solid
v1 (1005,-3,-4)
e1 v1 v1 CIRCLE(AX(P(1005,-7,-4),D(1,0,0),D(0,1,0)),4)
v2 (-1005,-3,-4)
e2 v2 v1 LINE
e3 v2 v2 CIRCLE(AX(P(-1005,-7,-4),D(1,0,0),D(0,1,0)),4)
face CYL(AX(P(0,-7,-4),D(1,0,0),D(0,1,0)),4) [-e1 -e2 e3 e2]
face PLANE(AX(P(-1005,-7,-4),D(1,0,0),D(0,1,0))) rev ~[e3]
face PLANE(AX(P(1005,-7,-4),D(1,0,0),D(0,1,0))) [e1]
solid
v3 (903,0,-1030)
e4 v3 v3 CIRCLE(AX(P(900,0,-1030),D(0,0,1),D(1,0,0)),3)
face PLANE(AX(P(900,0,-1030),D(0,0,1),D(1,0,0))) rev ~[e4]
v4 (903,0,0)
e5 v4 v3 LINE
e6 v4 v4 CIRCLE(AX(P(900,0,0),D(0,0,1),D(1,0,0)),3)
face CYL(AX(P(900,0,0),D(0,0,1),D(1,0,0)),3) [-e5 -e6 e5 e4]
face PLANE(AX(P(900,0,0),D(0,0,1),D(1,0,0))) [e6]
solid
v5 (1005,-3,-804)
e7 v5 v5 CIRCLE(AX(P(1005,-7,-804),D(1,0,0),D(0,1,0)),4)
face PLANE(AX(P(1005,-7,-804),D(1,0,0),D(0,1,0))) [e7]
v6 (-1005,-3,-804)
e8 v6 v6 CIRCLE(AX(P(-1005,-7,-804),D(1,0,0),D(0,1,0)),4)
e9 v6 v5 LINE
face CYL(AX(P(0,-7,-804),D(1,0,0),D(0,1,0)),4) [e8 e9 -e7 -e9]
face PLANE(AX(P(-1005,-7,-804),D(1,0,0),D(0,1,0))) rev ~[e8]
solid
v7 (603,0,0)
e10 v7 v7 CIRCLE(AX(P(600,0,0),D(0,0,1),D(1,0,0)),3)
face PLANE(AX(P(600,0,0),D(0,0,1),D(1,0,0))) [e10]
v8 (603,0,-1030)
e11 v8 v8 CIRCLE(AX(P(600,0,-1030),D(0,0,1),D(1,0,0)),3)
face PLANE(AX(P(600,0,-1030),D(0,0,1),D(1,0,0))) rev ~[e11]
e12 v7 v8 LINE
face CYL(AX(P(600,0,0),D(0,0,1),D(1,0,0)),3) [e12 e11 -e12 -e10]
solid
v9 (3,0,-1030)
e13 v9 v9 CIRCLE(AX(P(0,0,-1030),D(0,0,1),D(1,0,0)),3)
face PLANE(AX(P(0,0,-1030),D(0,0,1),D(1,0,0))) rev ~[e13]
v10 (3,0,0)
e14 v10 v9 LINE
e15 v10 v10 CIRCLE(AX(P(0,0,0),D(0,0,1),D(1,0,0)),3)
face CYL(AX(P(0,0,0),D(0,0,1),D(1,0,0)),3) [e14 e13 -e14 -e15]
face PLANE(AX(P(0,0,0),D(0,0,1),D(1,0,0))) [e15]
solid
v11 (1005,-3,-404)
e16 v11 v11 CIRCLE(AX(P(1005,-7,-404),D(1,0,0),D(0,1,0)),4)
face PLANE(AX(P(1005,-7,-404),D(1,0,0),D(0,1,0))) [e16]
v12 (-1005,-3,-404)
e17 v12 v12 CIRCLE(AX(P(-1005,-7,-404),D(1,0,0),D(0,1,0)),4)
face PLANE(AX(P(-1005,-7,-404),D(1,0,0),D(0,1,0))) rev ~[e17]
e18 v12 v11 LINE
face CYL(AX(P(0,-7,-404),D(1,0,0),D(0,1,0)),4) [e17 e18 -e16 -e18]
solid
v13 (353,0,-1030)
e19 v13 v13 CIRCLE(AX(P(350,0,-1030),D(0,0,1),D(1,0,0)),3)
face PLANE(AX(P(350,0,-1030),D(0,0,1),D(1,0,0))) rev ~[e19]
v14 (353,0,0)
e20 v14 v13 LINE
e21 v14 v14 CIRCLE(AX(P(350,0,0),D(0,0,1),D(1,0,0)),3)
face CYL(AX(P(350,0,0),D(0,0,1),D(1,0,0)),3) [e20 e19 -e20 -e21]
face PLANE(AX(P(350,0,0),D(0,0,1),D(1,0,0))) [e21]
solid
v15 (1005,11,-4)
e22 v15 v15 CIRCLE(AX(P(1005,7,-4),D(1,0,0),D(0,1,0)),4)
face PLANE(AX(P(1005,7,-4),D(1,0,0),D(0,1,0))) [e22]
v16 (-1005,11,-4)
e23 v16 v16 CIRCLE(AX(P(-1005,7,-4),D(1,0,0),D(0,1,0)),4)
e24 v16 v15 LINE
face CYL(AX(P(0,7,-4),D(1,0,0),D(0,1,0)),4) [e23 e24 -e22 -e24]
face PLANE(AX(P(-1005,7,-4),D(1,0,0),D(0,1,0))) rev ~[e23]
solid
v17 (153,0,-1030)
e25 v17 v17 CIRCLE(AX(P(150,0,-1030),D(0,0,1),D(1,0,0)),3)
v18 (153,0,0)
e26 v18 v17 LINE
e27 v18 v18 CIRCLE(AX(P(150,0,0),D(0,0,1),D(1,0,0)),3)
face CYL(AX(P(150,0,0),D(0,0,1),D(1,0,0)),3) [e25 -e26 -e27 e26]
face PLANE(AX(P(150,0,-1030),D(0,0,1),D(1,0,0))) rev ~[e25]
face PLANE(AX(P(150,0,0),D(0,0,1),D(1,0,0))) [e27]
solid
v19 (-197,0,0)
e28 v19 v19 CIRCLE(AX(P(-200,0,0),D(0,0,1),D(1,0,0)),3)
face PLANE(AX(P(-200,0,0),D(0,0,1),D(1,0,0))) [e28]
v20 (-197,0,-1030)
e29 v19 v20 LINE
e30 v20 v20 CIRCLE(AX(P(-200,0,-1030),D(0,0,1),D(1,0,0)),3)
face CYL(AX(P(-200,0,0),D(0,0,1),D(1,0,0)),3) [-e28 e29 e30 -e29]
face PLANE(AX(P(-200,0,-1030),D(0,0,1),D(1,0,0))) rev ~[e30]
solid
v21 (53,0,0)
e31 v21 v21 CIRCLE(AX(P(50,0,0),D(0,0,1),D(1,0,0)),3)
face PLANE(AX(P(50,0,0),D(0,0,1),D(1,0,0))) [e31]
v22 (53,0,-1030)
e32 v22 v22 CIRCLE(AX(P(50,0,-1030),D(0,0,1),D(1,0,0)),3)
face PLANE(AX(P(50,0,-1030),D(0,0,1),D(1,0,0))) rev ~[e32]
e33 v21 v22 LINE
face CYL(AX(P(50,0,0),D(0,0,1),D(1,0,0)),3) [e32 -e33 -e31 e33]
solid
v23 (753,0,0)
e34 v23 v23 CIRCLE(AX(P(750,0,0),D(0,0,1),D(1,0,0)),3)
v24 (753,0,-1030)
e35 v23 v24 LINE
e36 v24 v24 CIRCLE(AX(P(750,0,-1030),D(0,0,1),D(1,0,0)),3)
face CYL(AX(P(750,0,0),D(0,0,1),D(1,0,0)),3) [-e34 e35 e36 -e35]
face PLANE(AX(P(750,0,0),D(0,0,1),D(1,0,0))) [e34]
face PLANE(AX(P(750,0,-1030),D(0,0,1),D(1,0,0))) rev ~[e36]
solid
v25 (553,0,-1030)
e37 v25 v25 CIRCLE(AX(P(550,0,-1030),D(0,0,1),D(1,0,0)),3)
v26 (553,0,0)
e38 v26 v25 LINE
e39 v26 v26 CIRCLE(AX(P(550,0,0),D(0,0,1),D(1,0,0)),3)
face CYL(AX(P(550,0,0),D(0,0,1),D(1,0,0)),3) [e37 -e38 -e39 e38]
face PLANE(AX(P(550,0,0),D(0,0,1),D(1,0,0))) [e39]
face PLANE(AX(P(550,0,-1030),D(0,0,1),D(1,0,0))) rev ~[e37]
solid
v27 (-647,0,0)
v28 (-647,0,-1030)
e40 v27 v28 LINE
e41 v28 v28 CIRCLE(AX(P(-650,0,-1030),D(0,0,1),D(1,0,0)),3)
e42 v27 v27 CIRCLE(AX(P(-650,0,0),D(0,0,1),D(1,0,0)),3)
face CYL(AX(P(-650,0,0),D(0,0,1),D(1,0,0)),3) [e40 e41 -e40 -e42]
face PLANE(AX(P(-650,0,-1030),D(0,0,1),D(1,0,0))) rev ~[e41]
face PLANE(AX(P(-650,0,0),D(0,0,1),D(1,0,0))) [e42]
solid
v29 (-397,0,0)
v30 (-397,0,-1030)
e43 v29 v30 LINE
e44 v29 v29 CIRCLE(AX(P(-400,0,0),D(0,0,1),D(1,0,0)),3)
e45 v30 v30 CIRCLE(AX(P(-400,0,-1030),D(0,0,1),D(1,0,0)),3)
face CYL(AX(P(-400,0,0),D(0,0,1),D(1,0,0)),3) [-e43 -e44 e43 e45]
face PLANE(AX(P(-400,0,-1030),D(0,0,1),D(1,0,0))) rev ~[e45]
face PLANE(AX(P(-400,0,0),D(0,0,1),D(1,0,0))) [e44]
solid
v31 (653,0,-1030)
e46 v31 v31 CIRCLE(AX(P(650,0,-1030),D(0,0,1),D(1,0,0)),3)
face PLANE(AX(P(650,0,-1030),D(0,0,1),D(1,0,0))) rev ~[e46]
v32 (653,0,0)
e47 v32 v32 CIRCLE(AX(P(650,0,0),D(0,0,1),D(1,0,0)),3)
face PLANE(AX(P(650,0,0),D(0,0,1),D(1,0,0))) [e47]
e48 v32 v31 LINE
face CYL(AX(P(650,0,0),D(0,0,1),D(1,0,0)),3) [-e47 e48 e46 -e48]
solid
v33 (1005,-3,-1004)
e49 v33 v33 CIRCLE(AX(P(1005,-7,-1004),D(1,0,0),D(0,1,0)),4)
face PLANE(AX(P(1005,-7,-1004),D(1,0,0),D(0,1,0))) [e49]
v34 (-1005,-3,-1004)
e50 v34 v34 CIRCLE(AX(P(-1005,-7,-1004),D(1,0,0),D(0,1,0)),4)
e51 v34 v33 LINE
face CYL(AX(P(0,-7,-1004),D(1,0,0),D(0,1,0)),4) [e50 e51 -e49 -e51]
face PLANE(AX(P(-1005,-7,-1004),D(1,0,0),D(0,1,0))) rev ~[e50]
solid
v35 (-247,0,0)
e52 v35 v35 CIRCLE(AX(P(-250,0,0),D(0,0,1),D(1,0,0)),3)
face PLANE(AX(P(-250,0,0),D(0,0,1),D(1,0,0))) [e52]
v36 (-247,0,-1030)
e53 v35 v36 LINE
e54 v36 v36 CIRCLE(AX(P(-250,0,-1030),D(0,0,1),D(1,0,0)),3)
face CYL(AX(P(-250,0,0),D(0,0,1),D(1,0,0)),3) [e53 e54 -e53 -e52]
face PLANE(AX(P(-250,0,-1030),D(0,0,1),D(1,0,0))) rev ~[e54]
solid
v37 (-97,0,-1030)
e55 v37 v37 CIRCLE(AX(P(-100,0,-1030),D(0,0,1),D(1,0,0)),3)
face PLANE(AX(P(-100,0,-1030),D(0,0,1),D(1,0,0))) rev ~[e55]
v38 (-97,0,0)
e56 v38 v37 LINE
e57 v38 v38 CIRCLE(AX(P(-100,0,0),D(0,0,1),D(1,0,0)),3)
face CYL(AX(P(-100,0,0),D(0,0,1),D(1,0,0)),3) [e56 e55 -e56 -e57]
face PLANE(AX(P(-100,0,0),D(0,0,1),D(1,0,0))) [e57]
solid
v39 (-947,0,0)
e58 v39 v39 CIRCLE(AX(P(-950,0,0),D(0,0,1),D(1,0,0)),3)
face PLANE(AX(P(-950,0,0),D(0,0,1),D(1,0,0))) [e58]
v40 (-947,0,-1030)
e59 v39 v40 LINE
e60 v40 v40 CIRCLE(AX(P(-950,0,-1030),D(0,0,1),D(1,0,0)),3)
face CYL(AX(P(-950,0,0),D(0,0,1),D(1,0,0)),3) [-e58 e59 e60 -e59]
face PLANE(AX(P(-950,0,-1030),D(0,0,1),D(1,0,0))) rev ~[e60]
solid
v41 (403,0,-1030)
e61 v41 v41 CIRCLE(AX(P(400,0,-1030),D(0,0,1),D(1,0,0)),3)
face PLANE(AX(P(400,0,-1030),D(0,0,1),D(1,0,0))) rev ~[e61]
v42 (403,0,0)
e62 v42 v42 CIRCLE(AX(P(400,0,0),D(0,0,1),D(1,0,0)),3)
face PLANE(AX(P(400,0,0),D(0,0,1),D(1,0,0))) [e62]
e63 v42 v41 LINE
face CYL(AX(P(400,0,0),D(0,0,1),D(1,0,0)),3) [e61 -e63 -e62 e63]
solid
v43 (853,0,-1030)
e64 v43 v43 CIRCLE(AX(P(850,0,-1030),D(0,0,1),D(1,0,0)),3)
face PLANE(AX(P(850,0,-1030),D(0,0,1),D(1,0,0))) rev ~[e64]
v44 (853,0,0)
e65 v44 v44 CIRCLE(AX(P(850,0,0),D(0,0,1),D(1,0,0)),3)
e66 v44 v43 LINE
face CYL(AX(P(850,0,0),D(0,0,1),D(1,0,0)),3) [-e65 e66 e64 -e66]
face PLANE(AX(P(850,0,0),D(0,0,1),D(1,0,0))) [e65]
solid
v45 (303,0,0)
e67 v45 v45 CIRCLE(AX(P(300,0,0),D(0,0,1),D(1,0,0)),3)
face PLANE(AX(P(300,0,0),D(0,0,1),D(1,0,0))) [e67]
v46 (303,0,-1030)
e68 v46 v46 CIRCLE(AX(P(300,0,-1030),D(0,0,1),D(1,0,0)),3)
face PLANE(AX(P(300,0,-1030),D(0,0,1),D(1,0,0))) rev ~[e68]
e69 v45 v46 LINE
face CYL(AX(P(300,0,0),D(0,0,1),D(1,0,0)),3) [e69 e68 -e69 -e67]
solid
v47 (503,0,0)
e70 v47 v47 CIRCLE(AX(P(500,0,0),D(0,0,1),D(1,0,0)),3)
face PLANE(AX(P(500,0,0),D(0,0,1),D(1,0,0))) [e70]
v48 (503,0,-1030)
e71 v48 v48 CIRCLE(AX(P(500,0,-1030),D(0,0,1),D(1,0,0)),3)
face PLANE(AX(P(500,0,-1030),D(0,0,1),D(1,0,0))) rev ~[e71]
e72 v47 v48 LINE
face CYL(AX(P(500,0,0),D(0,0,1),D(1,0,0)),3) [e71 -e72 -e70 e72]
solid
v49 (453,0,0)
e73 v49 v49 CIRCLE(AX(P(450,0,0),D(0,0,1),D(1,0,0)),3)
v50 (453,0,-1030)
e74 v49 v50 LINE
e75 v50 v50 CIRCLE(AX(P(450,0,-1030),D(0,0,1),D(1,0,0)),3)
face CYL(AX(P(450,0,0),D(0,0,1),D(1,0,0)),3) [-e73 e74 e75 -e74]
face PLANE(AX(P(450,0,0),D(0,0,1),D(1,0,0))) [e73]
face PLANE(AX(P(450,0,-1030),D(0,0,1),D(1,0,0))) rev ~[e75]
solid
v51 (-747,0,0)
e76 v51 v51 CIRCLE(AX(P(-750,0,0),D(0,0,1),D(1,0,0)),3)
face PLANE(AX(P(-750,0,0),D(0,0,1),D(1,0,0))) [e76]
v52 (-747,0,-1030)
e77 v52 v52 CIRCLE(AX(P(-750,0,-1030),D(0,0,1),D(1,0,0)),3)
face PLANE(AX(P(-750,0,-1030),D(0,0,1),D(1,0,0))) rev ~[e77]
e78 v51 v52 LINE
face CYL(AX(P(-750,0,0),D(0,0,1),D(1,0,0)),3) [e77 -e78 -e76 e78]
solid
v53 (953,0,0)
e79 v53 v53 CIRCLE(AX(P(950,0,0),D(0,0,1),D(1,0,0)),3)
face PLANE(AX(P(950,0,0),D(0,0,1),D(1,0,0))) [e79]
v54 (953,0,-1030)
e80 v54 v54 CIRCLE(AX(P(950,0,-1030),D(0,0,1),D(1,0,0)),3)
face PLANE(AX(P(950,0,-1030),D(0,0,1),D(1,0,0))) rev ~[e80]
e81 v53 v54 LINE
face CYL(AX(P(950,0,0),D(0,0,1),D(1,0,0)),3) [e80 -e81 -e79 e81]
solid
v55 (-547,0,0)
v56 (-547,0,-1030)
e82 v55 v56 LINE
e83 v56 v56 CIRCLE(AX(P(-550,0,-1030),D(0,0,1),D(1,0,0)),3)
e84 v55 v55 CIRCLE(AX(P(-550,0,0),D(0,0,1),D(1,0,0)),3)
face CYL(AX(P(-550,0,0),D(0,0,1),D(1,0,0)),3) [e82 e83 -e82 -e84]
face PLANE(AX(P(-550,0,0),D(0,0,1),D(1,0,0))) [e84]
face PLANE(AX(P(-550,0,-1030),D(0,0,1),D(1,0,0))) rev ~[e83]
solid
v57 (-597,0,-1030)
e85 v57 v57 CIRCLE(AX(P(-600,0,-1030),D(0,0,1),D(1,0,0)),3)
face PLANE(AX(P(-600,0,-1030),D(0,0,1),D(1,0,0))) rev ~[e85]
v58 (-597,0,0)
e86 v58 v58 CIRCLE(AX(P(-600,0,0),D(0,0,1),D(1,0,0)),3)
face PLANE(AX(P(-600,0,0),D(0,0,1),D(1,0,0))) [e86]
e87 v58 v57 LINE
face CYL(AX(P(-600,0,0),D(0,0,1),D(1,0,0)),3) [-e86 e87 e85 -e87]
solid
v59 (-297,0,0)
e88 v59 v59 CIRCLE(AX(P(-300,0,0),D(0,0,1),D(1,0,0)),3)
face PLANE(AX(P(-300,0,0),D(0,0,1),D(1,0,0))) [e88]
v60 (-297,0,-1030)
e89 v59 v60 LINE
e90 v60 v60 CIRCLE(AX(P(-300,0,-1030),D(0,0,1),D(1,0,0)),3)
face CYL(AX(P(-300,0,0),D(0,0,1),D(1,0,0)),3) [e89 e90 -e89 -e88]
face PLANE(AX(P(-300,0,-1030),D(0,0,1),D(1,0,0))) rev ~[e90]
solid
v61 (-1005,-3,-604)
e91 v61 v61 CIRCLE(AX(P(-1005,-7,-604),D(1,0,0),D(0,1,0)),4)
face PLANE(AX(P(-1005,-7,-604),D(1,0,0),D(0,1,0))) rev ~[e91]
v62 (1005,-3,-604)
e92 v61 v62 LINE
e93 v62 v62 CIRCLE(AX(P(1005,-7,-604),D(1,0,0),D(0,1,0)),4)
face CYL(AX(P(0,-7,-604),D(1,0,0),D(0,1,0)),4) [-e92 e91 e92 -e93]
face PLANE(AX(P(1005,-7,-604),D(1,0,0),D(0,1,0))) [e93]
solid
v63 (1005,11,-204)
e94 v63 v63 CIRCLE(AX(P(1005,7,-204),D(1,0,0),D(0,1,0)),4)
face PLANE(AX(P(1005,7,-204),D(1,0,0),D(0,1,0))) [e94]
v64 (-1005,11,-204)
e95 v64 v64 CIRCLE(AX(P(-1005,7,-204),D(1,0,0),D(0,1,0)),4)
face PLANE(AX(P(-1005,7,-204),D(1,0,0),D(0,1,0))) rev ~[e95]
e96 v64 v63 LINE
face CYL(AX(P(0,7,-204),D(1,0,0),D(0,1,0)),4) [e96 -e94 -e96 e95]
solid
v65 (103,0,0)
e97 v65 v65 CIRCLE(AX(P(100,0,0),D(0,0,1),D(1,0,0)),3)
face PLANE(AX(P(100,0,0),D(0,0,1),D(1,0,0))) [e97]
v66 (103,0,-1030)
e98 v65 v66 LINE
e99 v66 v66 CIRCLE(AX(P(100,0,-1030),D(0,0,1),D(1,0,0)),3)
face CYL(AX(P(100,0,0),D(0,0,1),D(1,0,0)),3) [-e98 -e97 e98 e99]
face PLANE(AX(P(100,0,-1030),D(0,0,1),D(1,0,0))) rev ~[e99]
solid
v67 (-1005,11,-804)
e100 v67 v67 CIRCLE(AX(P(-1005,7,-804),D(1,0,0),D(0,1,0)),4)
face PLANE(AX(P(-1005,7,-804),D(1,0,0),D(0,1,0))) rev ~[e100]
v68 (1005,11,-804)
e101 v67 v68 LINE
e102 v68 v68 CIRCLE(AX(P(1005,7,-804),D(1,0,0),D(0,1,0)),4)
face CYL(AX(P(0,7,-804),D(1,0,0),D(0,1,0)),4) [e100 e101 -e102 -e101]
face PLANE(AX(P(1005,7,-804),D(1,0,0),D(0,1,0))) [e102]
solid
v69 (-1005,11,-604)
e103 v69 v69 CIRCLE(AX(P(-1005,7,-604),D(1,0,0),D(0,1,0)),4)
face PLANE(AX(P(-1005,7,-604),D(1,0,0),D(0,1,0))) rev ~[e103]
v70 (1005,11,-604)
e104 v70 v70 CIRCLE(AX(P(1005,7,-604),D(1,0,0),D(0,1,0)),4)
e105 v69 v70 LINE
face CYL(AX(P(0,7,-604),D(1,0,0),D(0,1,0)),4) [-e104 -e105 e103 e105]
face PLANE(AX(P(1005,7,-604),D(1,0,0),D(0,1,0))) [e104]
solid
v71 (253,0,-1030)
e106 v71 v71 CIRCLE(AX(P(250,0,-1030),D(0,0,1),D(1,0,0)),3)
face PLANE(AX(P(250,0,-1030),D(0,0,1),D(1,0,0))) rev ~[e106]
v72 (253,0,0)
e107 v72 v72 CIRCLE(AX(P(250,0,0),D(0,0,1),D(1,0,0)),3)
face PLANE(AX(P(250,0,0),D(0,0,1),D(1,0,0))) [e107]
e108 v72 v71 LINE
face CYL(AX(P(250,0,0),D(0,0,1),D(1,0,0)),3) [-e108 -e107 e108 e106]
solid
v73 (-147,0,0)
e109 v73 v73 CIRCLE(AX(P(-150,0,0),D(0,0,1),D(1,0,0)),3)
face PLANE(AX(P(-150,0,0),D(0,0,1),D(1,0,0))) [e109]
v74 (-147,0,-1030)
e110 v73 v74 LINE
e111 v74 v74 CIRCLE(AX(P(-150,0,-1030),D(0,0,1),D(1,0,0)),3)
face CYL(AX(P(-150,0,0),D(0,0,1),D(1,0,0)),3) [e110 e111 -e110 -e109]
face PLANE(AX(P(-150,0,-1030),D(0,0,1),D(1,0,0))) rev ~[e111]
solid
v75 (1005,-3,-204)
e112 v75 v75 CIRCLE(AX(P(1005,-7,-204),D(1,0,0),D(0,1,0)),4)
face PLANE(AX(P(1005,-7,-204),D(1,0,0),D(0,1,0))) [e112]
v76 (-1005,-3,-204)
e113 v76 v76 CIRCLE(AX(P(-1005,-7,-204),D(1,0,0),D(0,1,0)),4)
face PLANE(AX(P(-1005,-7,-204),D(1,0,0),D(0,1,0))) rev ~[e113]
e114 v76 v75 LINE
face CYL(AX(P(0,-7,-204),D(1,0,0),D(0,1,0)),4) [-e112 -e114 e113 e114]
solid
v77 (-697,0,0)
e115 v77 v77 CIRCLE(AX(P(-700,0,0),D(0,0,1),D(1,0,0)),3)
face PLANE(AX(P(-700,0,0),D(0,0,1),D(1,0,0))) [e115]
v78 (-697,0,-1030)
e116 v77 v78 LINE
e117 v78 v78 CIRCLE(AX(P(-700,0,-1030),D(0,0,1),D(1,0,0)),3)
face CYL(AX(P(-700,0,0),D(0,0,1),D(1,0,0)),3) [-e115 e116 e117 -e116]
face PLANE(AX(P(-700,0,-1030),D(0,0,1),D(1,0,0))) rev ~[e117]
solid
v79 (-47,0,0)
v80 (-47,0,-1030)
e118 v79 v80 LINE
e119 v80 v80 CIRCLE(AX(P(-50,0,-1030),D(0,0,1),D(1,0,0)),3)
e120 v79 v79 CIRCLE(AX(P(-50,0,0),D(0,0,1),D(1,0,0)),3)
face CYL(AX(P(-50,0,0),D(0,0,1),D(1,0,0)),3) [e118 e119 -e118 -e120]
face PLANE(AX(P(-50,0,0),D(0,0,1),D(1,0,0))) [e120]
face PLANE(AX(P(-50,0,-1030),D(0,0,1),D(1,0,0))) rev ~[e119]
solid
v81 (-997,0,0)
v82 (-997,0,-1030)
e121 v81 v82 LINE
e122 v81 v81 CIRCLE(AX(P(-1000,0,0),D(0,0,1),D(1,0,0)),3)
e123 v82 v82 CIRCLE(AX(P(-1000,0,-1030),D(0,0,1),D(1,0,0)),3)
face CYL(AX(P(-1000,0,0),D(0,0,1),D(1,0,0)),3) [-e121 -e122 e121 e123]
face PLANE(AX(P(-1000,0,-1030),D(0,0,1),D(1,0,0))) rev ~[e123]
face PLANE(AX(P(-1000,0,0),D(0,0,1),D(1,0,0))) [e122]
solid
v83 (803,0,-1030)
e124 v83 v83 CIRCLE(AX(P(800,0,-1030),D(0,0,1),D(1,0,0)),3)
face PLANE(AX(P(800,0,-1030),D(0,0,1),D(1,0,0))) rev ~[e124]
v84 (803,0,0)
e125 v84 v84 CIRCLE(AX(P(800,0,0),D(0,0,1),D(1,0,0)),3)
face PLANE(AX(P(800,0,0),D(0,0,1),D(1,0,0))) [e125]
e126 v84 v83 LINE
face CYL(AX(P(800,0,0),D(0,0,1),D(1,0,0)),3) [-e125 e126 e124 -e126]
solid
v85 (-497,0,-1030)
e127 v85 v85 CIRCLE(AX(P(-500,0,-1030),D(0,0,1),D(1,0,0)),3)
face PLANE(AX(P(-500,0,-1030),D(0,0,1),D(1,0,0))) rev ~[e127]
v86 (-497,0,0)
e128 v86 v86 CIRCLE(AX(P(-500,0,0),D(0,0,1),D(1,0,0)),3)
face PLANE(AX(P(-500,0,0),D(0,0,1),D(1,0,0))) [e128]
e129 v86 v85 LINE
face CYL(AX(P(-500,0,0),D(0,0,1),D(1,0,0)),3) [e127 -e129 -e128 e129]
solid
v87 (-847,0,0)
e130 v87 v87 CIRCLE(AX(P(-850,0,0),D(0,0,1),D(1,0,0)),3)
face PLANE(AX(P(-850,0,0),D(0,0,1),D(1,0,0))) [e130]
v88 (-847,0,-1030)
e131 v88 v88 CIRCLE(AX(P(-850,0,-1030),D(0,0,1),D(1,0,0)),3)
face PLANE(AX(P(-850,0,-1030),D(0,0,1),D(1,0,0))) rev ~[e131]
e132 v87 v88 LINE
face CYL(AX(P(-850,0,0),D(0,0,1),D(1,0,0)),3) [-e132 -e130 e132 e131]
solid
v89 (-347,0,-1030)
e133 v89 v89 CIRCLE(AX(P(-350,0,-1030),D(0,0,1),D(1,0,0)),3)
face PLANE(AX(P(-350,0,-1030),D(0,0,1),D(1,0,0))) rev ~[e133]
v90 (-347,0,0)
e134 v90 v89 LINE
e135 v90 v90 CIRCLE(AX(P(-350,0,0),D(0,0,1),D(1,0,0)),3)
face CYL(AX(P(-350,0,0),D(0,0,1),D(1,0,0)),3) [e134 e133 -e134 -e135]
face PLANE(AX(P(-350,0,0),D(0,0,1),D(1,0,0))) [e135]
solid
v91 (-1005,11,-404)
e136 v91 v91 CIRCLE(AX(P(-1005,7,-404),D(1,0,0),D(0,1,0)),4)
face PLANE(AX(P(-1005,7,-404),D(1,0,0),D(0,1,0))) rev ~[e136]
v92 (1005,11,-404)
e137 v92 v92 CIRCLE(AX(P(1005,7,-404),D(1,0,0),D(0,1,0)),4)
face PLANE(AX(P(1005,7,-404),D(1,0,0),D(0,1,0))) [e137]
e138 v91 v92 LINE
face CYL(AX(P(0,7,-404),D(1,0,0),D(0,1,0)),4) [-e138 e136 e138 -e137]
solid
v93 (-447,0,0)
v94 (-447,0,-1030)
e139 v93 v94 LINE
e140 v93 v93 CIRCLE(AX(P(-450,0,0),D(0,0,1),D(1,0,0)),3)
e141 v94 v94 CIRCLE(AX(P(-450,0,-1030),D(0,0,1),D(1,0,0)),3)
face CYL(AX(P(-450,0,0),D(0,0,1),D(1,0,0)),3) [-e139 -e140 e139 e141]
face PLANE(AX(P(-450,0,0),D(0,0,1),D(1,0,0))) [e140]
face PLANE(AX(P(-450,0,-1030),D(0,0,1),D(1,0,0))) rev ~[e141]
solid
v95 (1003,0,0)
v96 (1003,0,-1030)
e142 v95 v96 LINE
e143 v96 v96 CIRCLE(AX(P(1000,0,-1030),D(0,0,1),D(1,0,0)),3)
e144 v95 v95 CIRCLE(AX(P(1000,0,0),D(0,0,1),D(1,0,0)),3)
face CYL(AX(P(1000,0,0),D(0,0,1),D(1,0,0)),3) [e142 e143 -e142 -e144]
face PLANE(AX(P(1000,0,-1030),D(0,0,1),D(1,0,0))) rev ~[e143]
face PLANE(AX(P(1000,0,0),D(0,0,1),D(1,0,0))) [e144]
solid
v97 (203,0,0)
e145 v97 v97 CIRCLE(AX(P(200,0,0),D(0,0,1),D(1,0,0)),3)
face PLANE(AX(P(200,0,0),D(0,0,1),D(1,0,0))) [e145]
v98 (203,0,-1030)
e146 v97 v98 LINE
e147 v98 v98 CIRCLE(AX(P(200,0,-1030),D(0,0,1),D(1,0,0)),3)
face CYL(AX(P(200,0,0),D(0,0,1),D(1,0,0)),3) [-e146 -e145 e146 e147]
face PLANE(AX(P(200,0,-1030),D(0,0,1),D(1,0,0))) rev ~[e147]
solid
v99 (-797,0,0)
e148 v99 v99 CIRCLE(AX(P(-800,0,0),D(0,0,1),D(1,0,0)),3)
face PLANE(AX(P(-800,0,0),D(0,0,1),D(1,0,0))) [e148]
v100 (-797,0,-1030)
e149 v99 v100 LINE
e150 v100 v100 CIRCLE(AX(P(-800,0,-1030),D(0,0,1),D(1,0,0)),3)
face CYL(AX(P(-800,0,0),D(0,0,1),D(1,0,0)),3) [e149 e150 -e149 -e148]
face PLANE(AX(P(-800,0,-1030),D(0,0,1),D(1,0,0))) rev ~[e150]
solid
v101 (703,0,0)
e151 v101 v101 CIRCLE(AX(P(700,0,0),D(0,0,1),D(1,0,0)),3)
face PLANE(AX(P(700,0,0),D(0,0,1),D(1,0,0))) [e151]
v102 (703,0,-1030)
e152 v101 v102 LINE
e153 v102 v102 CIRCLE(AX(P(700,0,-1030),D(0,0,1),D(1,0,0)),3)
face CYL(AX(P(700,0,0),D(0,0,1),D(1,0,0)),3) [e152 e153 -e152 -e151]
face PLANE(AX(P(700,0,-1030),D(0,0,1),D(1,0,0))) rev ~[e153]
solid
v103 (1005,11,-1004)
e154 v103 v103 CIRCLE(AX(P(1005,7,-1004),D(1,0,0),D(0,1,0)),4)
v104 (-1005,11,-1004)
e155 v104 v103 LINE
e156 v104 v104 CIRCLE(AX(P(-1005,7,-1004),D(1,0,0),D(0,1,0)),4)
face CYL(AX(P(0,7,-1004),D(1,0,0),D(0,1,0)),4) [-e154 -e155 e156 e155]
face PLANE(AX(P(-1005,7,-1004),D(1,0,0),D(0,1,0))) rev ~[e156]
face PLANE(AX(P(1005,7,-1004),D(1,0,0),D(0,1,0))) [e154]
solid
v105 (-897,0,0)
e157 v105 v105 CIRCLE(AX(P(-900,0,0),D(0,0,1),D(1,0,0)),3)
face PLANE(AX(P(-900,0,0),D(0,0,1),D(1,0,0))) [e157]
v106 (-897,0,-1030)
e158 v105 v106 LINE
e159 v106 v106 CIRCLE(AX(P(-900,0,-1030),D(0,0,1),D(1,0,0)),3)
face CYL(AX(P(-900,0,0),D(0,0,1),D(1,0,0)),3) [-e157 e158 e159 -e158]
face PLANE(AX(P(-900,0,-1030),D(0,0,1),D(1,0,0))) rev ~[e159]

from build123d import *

# Parameters (mm, degrees)
F0_R     = 3
F1_DEPTH = 1030
F2_R     = 4
F3_DEPTH = 1005


with BuildPart() as f1:
    # F0 (on Top) → F1 (new body)
    with BuildSketch(Plane.XY):
        with Locations((750, 0)):
            Circle(F0_R)
    extrude(amount=-F1_DEPTH)


with BuildPart() as f1b:
    # F0 (on Top) → F1, piece 2 (new body)
    with BuildSketch(Plane.XY):
        with Locations((-550, 0)):
            Circle(F0_R)
    extrude(amount=-F1_DEPTH)


with BuildPart() as f1c:
    # F0 (on Top) → F1, piece 3 (new body)
    with BuildSketch(Plane.XY):
        with Locations((950, 0)):
            Circle(F0_R)
    extrude(amount=-F1_DEPTH)


with BuildPart() as f1d:
    # F0 (on Top) → F1, piece 4 (new body)
    with BuildSketch(Plane.XY):
        with Locations((450, 0)):
            Circle(F0_R)
    extrude(amount=-F1_DEPTH)


with BuildPart() as f1e:
    # F0 (on Top) → F1, piece 5 (new body)
    with BuildSketch(Plane.XY):
        with Locations((-800, 0)):
            Circle(F0_R)
    extrude(amount=-F1_DEPTH)


with BuildPart() as f1f:
    # F0 (on Top) → F1, piece 6 (new body)
    with BuildSketch(Plane.XY):
        with Locations((-900, 0)):
            Circle(F0_R)
    extrude(amount=-F1_DEPTH)


with BuildPart() as f1g:
    # F0 (on Top) → F1, piece 7 (new body)
    with BuildSketch(Plane.XY):
        with Locations((350, 0)):
            Circle(F0_R)
    extrude(amount=-F1_DEPTH)


with BuildPart() as f1h:
    # F0 (on Top) → F1, piece 8 (new body)
    with BuildSketch(Plane.XY):
        with Locations((-700, 0)):
            Circle(F0_R)
    extrude(amount=-F1_DEPTH)


with BuildPart() as f1i:
    # F0 (on Top) → F1, piece 9 (new body)
    with BuildSketch(Plane.XY):
        with Locations((1000, 0)):
            Circle(F0_R)
    extrude(amount=-F1_DEPTH)


with BuildPart() as f1j:
    # F0 (on Top) → F1, piece 10 (new body)
    with BuildSketch(Plane.XY):
        with Locations((600, 0)):
            Circle(F0_R)
    extrude(amount=-F1_DEPTH)


with BuildPart() as f1k:
    # F0 (on Top) → F1, piece 11 (new body)
    with BuildSketch(Plane.XY):
        with Locations((700, 0)):
            Circle(F0_R)
    extrude(amount=-F1_DEPTH)


with BuildPart() as f1l:
    # F0 (on Top) → F1, piece 12 (new body)
    with BuildSketch(Plane.XY):
        with Locations((650, 0)):
            Circle(F0_R)
    extrude(amount=-F1_DEPTH)


with BuildPart() as f1m:
    # F0 (on Top) → F1, piece 13 (new body)
    with BuildSketch(Plane.XY):
        with Locations((-650, 0)):
            Circle(F0_R)
    extrude(amount=-F1_DEPTH)


with BuildPart() as f1n:
    # F0 (on Top) → F1, piece 14 (new body)
    with BuildSketch(Plane.XY):
        with Locations((850, 0)):
            Circle(F0_R)
    extrude(amount=-F1_DEPTH)


with BuildPart() as f1o:
    # F0 (on Top) → F1, piece 15 (new body)
    with BuildSketch(Plane.XY):
        with Locations((-300, 0)):
            Circle(F0_R)
    extrude(amount=-F1_DEPTH)


with BuildPart() as f1p:
    # F0 (on Top) → F1, piece 16 (new body)
    with BuildSketch(Plane.XY):
        with Locations((-250, 0)):
            Circle(F0_R)
    extrude(amount=-F1_DEPTH)


with BuildPart() as f1q:
    # F0 (on Top) → F1, piece 17 (new body)
    with BuildSketch(Plane.XY):
        with Locations((-350, 0)):
            Circle(F0_R)
    extrude(amount=-F1_DEPTH)


with BuildPart() as f1r:
    # F0 (on Top) → F1, piece 18 (new body)
    with BuildSketch(Plane.XY):
        with Locations((-400, 0)):
            Circle(F0_R)
    extrude(amount=-F1_DEPTH)


with BuildPart() as f1s:
    # F0 (on Top) → F1, piece 19 (new body)
    with BuildSketch(Plane.XY):
        with Locations((-500, 0)):
            Circle(F0_R)
    extrude(amount=-F1_DEPTH)


with BuildPart() as f1t:
    # F0 (on Top) → F1, piece 20 (new body)
    with BuildSketch(Plane.XY):
        with Locations((-950, 0)):
            Circle(F0_R)
    extrude(amount=-F1_DEPTH)


with BuildPart() as f1u:
    # F0 (on Top) → F1, piece 21 (new body)
    with BuildSketch(Plane.XY):
        with Locations((-450, 0)):
            Circle(F0_R)
    extrude(amount=-F1_DEPTH)


with BuildPart() as f1v:
    # F0 (on Top) → F1, piece 22 (new body)
    with BuildSketch(Plane.XY):
        with Locations((150, 0)):
            Circle(F0_R)
    extrude(amount=-F1_DEPTH)


with BuildPart() as f1w:
    # F0 (on Top) → F1, piece 23 (new body)
    with BuildSketch(Plane.XY):
        with Locations((50, 0)):
            Circle(F0_R)
    extrude(amount=-F1_DEPTH)


with BuildPart() as f1x:
    # F0 (on Top) → F1, piece 24 (new body)
    with BuildSketch(Plane.XY):
        with Locations((100, 0)):
            Circle(F0_R)
    extrude(amount=-F1_DEPTH)


with BuildPart() as f1y:
    # F0 (on Top) → F1, piece 25 (new body)
    with BuildSketch(Plane.XY):
        Circle(F0_R)
    extrude(amount=-F1_DEPTH)


with BuildPart() as f1z:
    # F0 (on Top) → F1, piece 26 (new body)
    with BuildSketch(Plane.XY):
        with Locations((-50, 0)):
            Circle(F0_R)
    extrude(amount=-F1_DEPTH)


with BuildPart() as f1ba:
    # F0 (on Top) → F1, piece 27 (new body)
    with BuildSketch(Plane.XY):
        with Locations((-150, 0)):
            Circle(F0_R)
    extrude(amount=-F1_DEPTH)


with BuildPart() as f1bb:
    # F0 (on Top) → F1, piece 28 (new body)
    with BuildSketch(Plane.XY):
        with Locations((-100, 0)):
            Circle(F0_R)
    extrude(amount=-F1_DEPTH)


with BuildPart() as f1bc:
    # F0 (on Top) → F1, piece 29 (new body)
    with BuildSketch(Plane.XY):
        with Locations((-1000, 0)):
            Circle(F0_R)
    extrude(amount=-F1_DEPTH)


with BuildPart() as f1bd:
    # F0 (on Top) → F1, piece 30 (new body)
    with BuildSketch(Plane.XY):
        with Locations((300, 0)):
            Circle(F0_R)
    extrude(amount=-F1_DEPTH)


with BuildPart() as f1be:
    # F0 (on Top) → F1, piece 31 (new body)
    with BuildSketch(Plane.XY):
        with Locations((250, 0)):
            Circle(F0_R)
    extrude(amount=-F1_DEPTH)


with BuildPart() as f1bf:
    # F0 (on Top) → F1, piece 32 (new body)
    with BuildSketch(Plane.XY):
        with Locations((-200, 0)):
            Circle(F0_R)
    extrude(amount=-F1_DEPTH)


with BuildPart() as f1bg:
    # F0 (on Top) → F1, piece 33 (new body)
    with BuildSketch(Plane.XY):
        with Locations((900, 0)):
            Circle(F0_R)
    extrude(amount=-F1_DEPTH)


with BuildPart() as f1bh:
    # F0 (on Top) → F1, piece 34 (new body)
    with BuildSketch(Plane.XY):
        with Locations((-750, 0)):
            Circle(F0_R)
    extrude(amount=-F1_DEPTH)


with BuildPart() as f1bi:
    # F0 (on Top) → F1, piece 35 (new body)
    with BuildSketch(Plane.XY):
        with Locations((200, 0)):
            Circle(F0_R)
    extrude(amount=-F1_DEPTH)


with BuildPart() as f1bj:
    # F0 (on Top) → F1, piece 36 (new body)
    with BuildSketch(Plane.XY):
        with Locations((500, 0)):
            Circle(F0_R)
    extrude(amount=-F1_DEPTH)


with BuildPart() as f1bk:
    # F0 (on Top) → F1, piece 37 (new body)
    with BuildSketch(Plane.XY):
        with Locations((550, 0)):
            Circle(F0_R)
    extrude(amount=-F1_DEPTH)


with BuildPart() as f1bl:
    # F0 (on Top) → F1, piece 38 (new body)
    with BuildSketch(Plane.XY):
        with Locations((-600, 0)):
            Circle(F0_R)
    extrude(amount=-F1_DEPTH)


with BuildPart() as f1bm:
    # F0 (on Top) → F1, piece 39 (new body)
    with BuildSketch(Plane.XY):
        with Locations((800, 0)):
            Circle(F0_R)
    extrude(amount=-F1_DEPTH)


with BuildPart() as f1bn:
    # F0 (on Top) → F1, piece 40 (new body)
    with BuildSketch(Plane.XY):
        with Locations((-850, 0)):
            Circle(F0_R)
    extrude(amount=-F1_DEPTH)


with BuildPart() as f1bo:
    # F0 (on Top) → F1, piece 41 (new body)
    with BuildSketch(Plane.XY):
        with Locations((400, 0)):
            Circle(F0_R)
    extrude(amount=-F1_DEPTH)


with BuildPart() as f3:
    # F2 (on Right) → F3 (new body, symmetric)
    with BuildSketch(Plane.YZ):
        with Locations((7, -4)):
            Circle(F2_R)
    extrude(amount=F3_DEPTH, both=True)


with BuildPart() as f3b:
    # F2 (on Right) → F3, piece 2 (new body, symmetric)
    with BuildSketch(Plane.YZ):
        with Locations((-7, -4)):
            Circle(F2_R)
    extrude(amount=F3_DEPTH, both=True)


with BuildPart() as f3c:
    # F2 (on Right) → F3, piece 3 (new body, symmetric)
    with BuildSketch(Plane.YZ):
        with Locations((7, -204)):
            Circle(F2_R)
    extrude(amount=F3_DEPTH, both=True)


with BuildPart() as f3d:
    # F2 (on Right) → F3, piece 4 (new body, symmetric)
    with BuildSketch(Plane.YZ):
        with Locations((-7, -204)):
            Circle(F2_R)
    extrude(amount=F3_DEPTH, both=True)


with BuildPart() as f3e:
    # F2 (on Right) → F3, piece 5 (new body, symmetric)
    with BuildSketch(Plane.YZ):
        with Locations((7, -404)):
            Circle(F2_R)
    extrude(amount=F3_DEPTH, both=True)


with BuildPart() as f3f:
    # F2 (on Right) → F3, piece 6 (new body, symmetric)
    with BuildSketch(Plane.YZ):
        with Locations((-7, -404)):
            Circle(F2_R)
    extrude(amount=F3_DEPTH, both=True)


with BuildPart() as f3g:
    # F2 (on Right) → F3, piece 7 (new body, symmetric)
    with BuildSketch(Plane.YZ):
        with Locations((7, -604)):
            Circle(F2_R)
    extrude(amount=F3_DEPTH, both=True)


with BuildPart() as f3h:
    # F2 (on Right) → F3, piece 8 (new body, symmetric)
    with BuildSketch(Plane.YZ):
        with Locations((-7, -604)):
            Circle(F2_R)
    extrude(amount=F3_DEPTH, both=True)


with BuildPart() as f3i:
    # F2 (on Right) → F3, piece 9 (new body, symmetric)
    with BuildSketch(Plane.YZ):
        with Locations((7, -804)):
            Circle(F2_R)
    extrude(amount=F3_DEPTH, both=True)


with BuildPart() as f3j:
    # F2 (on Right) → F3, piece 10 (new body, symmetric)
    with BuildSketch(Plane.YZ):
        with Locations((-7, -804)):
            Circle(F2_R)
    extrude(amount=F3_DEPTH, both=True)


with BuildPart() as f3k:
    # F2 (on Right) → F3, piece 11 (new body, symmetric)
    with BuildSketch(Plane.YZ):
        with Locations((7, -1004)):
            Circle(F2_R)
    extrude(amount=F3_DEPTH, both=True)


with BuildPart() as f3l:
    # F2 (on Right) → F3, piece 12 (new body, symmetric)
    with BuildSketch(Plane.YZ):
        with Locations((-7, -1004)):
            Circle(F2_R)
    extrude(amount=F3_DEPTH, both=True)


solid = Compound([f1.part, f1b.part, f1c.part, f1d.part, f1e.part, f1f.part, f1g.part, f1h.part, f1i.part, f1j.part, f1k.part, f1l.part, f1m.part, f1n.part, f1o.part, f1p.part, f1q.part, f1r.part, f1s.part, f1t.part, f1u.part, f1v.part, f1w.part, f1x.part, f1y.part, f1z.part, f1ba.part, f1bb.part, f1bc.part, f1bd.part, f1be.part, f1bf.part, f1bg.part, f1bh.part, f1bi.part, f1bj.part, f1bk.part, f1bl.part, f1bm.part, f1bn.part, f1bo.part, f3.part, f3b.part, f3c.part, f3d.part, f3e.part, f3f.part, f3g.part, f3h.part, f3i.part, f3j.part, f3k.part, f3l.part])
